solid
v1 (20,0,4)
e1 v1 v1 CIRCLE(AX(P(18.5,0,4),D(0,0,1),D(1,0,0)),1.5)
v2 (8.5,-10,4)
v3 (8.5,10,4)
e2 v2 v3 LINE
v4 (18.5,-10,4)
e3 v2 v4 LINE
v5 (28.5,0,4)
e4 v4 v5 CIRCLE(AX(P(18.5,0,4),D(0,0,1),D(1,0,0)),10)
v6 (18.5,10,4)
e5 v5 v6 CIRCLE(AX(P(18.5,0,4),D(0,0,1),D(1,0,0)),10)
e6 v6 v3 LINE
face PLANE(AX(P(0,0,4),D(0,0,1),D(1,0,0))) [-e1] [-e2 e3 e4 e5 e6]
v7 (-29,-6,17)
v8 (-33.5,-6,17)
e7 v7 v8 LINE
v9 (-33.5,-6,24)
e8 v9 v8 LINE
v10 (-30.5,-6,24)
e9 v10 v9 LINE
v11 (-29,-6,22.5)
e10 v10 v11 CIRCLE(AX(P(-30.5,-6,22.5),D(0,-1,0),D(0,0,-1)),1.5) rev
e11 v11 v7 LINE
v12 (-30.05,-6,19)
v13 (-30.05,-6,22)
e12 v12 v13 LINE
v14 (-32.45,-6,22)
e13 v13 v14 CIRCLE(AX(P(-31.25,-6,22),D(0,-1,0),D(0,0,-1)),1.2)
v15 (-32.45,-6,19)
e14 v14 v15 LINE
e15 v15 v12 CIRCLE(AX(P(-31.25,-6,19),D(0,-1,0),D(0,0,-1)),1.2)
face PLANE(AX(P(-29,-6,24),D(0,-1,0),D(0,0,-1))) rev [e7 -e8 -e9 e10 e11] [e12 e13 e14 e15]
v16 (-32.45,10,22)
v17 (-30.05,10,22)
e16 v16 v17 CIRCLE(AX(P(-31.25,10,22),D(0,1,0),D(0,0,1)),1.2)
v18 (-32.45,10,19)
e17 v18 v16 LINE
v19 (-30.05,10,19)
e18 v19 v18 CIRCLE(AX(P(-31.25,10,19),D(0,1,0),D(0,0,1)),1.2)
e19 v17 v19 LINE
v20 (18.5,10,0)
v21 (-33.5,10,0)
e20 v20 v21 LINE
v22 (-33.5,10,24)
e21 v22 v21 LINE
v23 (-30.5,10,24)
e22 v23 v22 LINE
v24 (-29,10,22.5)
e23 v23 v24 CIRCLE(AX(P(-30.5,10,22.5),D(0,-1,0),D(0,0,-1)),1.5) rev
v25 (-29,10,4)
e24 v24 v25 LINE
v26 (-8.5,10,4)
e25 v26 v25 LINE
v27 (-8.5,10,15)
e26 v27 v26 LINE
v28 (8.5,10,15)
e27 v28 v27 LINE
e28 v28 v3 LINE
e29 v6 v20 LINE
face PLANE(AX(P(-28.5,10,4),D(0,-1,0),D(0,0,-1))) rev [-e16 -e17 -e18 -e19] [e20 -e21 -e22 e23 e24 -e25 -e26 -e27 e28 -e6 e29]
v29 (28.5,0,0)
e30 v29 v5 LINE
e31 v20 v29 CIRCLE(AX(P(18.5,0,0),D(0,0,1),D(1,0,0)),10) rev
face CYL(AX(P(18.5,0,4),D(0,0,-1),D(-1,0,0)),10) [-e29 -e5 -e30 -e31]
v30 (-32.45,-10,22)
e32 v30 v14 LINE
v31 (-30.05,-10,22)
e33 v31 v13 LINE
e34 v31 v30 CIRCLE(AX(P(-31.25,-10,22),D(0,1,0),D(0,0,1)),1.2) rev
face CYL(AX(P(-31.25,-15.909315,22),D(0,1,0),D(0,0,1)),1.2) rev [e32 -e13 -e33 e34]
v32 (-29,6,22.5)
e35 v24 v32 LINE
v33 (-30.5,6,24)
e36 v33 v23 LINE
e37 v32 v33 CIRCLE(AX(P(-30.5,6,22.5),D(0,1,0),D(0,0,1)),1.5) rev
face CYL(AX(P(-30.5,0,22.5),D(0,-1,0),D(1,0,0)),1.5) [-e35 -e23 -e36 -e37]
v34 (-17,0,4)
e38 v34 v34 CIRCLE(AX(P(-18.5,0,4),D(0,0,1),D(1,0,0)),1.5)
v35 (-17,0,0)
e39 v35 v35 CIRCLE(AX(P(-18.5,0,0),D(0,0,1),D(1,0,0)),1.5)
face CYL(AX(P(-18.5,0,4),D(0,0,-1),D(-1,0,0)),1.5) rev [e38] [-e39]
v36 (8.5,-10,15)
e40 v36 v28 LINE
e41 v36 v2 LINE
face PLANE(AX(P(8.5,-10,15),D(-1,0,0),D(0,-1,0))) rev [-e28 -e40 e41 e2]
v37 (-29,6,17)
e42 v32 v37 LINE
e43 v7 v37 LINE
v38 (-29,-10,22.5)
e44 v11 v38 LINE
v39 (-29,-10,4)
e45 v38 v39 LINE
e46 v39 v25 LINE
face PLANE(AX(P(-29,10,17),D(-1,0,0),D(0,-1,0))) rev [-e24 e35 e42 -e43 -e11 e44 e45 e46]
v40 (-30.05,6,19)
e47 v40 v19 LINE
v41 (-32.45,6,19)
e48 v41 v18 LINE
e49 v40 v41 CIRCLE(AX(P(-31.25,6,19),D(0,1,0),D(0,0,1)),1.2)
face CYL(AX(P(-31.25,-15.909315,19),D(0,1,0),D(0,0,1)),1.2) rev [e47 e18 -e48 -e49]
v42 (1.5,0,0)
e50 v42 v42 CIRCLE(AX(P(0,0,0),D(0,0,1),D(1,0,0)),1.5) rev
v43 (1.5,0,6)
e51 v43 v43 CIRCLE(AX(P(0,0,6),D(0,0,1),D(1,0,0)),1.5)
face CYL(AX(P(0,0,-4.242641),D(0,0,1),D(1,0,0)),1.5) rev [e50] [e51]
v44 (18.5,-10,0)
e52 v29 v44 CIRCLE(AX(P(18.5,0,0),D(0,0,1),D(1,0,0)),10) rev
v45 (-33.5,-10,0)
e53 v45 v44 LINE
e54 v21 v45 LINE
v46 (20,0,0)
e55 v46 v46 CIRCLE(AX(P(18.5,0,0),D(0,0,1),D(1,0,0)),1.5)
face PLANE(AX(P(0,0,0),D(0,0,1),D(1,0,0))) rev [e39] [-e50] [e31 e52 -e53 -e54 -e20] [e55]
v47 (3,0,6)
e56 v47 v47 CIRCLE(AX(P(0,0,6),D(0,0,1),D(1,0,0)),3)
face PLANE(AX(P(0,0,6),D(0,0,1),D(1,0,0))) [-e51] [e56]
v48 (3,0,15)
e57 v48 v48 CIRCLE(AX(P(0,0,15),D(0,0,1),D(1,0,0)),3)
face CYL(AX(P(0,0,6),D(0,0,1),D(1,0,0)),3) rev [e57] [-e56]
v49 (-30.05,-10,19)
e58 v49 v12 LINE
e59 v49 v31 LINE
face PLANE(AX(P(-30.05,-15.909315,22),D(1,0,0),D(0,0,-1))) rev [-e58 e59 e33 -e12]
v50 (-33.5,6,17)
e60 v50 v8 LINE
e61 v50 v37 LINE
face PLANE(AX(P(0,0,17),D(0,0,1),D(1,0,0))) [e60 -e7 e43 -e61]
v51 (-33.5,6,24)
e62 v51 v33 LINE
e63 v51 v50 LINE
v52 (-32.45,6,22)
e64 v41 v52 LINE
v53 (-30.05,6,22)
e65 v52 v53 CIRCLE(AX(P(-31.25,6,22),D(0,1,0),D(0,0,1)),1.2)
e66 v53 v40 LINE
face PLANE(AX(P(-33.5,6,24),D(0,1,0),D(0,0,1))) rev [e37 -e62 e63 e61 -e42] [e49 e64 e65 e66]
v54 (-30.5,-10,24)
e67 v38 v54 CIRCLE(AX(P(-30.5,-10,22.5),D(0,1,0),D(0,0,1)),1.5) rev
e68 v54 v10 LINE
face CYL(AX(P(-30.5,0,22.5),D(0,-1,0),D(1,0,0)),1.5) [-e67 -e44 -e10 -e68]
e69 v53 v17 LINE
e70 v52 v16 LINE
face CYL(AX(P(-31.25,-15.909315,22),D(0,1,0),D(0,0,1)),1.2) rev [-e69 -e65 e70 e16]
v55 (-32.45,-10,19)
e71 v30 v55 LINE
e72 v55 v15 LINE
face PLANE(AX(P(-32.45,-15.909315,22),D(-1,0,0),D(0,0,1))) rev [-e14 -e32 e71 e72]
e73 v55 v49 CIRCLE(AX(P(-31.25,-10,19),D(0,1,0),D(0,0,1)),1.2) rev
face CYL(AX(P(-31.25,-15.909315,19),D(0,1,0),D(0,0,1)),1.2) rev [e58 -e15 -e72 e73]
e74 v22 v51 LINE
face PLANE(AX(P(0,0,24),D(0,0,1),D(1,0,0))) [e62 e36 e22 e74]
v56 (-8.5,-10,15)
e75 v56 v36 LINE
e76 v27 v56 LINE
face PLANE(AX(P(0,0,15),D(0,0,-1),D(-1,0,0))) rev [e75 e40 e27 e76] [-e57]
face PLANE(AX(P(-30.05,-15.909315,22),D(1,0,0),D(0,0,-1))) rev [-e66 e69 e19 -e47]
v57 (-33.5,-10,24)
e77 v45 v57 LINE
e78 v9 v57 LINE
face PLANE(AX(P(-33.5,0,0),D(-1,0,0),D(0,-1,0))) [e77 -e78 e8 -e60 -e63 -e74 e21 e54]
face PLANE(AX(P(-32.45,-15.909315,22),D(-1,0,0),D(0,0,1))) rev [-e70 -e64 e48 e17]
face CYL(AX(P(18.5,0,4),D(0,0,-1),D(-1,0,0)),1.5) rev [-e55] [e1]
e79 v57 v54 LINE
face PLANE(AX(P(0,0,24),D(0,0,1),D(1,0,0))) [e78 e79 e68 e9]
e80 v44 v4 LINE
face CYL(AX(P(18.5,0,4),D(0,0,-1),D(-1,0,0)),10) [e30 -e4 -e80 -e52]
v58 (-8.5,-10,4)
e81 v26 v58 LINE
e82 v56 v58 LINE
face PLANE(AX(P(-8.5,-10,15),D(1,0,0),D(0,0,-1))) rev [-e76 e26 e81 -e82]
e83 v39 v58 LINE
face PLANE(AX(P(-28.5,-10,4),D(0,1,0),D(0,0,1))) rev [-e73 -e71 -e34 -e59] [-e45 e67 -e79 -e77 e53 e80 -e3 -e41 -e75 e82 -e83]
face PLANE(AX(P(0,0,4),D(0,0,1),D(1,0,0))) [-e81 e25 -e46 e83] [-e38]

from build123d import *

# Parameters (mm, degrees)
SKETCH_1_W          = 57
SKETCH_1_H          = 20
SKETCH_1_R          = 1.5
EXTRUDE_1_DEPTH     = 4
FILLET_1_R          = 10
SKETCH_4_W          = 17
SKETCH_4_H          = 20
EXTRUDE_3_DEPTH     = 11
SKETCH_5_R          = 3
CUT_EXTRUDE_1_DEPTH = 9
SKETCH_6_R          = 1.5
CUT_EXTRUDE_2_DEPTH = 6
SKETCH_7_W          = 4
SKETCH_7_H          = 20
EXTRUDE_4_DEPTH     = 5
SKETCH_8_W          = 4.5
SKETCH_8_H          = 20
EXTRUDE_5_DEPTH     = 13
SKETCH_9_W          = 4.5
SKETCH_9_H          = 4
EXTRUDE_6_DEPTH     = 7
CUT_EXTRUDE_START   = -20
CUT_EXTRUDE_3_DEPTH = 20
FILLET_2_R          = 1.5


with BuildPart() as part:
    # 草图1 → 凸台-拉伸1 (new body)
    with BuildSketch(Plane.XY):
        Rectangle(SKETCH_1_W, SKETCH_1_H)
        with Locations((-18.5, 0)):
            Circle(SKETCH_1_R, mode=Mode.SUBTRACT)
        with Locations((18.5, 0)):
            Circle(SKETCH_1_R, mode=Mode.SUBTRACT)
    extrude(amount=EXTRUDE_1_DEPTH)

    # 圆角1
    fillet_1_edges = [part.edges().sort_by_distance(p)[0] for p in [
        (28.5, -10, 2),
        (28.5, 10, 2),
    ]]
    fillet(fillet_1_edges, radius=FILLET_1_R - 0.0001)  # a hair under: the kernel refuses the full size

    # 草图4 → 凸台-拉伸3 (add)
    with BuildSketch(Plane.XY.offset(4)):
        Rectangle(SKETCH_4_W, SKETCH_4_H)
    extrude(amount=EXTRUDE_3_DEPTH)

    # 草图5 → 切除-拉伸1 (cut)
    with BuildSketch(Plane.XY.offset(15)):
        Circle(SKETCH_5_R)
    extrude(amount=-CUT_EXTRUDE_1_DEPTH, mode=Mode.SUBTRACT)

    # 草图6 → 切除-拉伸2 (cut)
    with BuildSketch(Plane.XY.offset(6)):
        Circle(SKETCH_6_R)
    extrude(amount=-CUT_EXTRUDE_2_DEPTH, mode=Mode.SUBTRACT)

    # 草图7 → 凸台-拉伸4 (add)
    with BuildSketch(Plane.ZY.offset(28.5)):
        with Locations((2, 0)):
            Rectangle(SKETCH_7_W, SKETCH_7_H)
    extrude(amount=EXTRUDE_4_DEPTH)

    # 草图8 → 凸台-拉伸5 (add)
    with BuildSketch(Plane.XY.offset(4)):
        with Locations((-31.25, 0)):
            Rectangle(SKETCH_8_W, SKETCH_8_H)
    extrude(amount=EXTRUDE_5_DEPTH)

    # 草图9 → 凸台-拉伸6 (add)
    with BuildSketch(Plane.XY.offset(17)):
        with Locations((-31.25, 8)):
            Rectangle(SKETCH_9_W, SKETCH_9_H)
        with Locations((-31.25, -8)):
            Rectangle(SKETCH_9_W, SKETCH_9_H)
    extrude(amount=EXTRUDE_6_DEPTH)

    # 草图10 → 切除-拉伸3 (cut)
    with BuildSketch(Plane(origin=(0, 10, 0), x_dir=(1, 0, 0), z_dir=(0, 1, 0)).offset(CUT_EXTRUDE_START)):
        with BuildLine():
            Line((-32.45, -22), (-32.45, -19))
            ThreePointArc((-32.45, -19), (-31.25, -17.8), (-30.05, -19))
            Line((-30.05, -19), (-30.05, -22))
            ThreePointArc((-30.05, -22), (-31.25, -23.2), (-32.45, -22))
        make_face()
    extrude(amount=CUT_EXTRUDE_3_DEPTH, mode=Mode.SUBTRACT)

    # 圆角2
    fillet_2_edges = [part.edges().sort_by_distance(p)[0] for p in [
        (-29, 8, 24),
        (-29, -8, 24),
    ]]
    fillet(fillet_2_edges, radius=FILLET_2_R)


solid = part.part
